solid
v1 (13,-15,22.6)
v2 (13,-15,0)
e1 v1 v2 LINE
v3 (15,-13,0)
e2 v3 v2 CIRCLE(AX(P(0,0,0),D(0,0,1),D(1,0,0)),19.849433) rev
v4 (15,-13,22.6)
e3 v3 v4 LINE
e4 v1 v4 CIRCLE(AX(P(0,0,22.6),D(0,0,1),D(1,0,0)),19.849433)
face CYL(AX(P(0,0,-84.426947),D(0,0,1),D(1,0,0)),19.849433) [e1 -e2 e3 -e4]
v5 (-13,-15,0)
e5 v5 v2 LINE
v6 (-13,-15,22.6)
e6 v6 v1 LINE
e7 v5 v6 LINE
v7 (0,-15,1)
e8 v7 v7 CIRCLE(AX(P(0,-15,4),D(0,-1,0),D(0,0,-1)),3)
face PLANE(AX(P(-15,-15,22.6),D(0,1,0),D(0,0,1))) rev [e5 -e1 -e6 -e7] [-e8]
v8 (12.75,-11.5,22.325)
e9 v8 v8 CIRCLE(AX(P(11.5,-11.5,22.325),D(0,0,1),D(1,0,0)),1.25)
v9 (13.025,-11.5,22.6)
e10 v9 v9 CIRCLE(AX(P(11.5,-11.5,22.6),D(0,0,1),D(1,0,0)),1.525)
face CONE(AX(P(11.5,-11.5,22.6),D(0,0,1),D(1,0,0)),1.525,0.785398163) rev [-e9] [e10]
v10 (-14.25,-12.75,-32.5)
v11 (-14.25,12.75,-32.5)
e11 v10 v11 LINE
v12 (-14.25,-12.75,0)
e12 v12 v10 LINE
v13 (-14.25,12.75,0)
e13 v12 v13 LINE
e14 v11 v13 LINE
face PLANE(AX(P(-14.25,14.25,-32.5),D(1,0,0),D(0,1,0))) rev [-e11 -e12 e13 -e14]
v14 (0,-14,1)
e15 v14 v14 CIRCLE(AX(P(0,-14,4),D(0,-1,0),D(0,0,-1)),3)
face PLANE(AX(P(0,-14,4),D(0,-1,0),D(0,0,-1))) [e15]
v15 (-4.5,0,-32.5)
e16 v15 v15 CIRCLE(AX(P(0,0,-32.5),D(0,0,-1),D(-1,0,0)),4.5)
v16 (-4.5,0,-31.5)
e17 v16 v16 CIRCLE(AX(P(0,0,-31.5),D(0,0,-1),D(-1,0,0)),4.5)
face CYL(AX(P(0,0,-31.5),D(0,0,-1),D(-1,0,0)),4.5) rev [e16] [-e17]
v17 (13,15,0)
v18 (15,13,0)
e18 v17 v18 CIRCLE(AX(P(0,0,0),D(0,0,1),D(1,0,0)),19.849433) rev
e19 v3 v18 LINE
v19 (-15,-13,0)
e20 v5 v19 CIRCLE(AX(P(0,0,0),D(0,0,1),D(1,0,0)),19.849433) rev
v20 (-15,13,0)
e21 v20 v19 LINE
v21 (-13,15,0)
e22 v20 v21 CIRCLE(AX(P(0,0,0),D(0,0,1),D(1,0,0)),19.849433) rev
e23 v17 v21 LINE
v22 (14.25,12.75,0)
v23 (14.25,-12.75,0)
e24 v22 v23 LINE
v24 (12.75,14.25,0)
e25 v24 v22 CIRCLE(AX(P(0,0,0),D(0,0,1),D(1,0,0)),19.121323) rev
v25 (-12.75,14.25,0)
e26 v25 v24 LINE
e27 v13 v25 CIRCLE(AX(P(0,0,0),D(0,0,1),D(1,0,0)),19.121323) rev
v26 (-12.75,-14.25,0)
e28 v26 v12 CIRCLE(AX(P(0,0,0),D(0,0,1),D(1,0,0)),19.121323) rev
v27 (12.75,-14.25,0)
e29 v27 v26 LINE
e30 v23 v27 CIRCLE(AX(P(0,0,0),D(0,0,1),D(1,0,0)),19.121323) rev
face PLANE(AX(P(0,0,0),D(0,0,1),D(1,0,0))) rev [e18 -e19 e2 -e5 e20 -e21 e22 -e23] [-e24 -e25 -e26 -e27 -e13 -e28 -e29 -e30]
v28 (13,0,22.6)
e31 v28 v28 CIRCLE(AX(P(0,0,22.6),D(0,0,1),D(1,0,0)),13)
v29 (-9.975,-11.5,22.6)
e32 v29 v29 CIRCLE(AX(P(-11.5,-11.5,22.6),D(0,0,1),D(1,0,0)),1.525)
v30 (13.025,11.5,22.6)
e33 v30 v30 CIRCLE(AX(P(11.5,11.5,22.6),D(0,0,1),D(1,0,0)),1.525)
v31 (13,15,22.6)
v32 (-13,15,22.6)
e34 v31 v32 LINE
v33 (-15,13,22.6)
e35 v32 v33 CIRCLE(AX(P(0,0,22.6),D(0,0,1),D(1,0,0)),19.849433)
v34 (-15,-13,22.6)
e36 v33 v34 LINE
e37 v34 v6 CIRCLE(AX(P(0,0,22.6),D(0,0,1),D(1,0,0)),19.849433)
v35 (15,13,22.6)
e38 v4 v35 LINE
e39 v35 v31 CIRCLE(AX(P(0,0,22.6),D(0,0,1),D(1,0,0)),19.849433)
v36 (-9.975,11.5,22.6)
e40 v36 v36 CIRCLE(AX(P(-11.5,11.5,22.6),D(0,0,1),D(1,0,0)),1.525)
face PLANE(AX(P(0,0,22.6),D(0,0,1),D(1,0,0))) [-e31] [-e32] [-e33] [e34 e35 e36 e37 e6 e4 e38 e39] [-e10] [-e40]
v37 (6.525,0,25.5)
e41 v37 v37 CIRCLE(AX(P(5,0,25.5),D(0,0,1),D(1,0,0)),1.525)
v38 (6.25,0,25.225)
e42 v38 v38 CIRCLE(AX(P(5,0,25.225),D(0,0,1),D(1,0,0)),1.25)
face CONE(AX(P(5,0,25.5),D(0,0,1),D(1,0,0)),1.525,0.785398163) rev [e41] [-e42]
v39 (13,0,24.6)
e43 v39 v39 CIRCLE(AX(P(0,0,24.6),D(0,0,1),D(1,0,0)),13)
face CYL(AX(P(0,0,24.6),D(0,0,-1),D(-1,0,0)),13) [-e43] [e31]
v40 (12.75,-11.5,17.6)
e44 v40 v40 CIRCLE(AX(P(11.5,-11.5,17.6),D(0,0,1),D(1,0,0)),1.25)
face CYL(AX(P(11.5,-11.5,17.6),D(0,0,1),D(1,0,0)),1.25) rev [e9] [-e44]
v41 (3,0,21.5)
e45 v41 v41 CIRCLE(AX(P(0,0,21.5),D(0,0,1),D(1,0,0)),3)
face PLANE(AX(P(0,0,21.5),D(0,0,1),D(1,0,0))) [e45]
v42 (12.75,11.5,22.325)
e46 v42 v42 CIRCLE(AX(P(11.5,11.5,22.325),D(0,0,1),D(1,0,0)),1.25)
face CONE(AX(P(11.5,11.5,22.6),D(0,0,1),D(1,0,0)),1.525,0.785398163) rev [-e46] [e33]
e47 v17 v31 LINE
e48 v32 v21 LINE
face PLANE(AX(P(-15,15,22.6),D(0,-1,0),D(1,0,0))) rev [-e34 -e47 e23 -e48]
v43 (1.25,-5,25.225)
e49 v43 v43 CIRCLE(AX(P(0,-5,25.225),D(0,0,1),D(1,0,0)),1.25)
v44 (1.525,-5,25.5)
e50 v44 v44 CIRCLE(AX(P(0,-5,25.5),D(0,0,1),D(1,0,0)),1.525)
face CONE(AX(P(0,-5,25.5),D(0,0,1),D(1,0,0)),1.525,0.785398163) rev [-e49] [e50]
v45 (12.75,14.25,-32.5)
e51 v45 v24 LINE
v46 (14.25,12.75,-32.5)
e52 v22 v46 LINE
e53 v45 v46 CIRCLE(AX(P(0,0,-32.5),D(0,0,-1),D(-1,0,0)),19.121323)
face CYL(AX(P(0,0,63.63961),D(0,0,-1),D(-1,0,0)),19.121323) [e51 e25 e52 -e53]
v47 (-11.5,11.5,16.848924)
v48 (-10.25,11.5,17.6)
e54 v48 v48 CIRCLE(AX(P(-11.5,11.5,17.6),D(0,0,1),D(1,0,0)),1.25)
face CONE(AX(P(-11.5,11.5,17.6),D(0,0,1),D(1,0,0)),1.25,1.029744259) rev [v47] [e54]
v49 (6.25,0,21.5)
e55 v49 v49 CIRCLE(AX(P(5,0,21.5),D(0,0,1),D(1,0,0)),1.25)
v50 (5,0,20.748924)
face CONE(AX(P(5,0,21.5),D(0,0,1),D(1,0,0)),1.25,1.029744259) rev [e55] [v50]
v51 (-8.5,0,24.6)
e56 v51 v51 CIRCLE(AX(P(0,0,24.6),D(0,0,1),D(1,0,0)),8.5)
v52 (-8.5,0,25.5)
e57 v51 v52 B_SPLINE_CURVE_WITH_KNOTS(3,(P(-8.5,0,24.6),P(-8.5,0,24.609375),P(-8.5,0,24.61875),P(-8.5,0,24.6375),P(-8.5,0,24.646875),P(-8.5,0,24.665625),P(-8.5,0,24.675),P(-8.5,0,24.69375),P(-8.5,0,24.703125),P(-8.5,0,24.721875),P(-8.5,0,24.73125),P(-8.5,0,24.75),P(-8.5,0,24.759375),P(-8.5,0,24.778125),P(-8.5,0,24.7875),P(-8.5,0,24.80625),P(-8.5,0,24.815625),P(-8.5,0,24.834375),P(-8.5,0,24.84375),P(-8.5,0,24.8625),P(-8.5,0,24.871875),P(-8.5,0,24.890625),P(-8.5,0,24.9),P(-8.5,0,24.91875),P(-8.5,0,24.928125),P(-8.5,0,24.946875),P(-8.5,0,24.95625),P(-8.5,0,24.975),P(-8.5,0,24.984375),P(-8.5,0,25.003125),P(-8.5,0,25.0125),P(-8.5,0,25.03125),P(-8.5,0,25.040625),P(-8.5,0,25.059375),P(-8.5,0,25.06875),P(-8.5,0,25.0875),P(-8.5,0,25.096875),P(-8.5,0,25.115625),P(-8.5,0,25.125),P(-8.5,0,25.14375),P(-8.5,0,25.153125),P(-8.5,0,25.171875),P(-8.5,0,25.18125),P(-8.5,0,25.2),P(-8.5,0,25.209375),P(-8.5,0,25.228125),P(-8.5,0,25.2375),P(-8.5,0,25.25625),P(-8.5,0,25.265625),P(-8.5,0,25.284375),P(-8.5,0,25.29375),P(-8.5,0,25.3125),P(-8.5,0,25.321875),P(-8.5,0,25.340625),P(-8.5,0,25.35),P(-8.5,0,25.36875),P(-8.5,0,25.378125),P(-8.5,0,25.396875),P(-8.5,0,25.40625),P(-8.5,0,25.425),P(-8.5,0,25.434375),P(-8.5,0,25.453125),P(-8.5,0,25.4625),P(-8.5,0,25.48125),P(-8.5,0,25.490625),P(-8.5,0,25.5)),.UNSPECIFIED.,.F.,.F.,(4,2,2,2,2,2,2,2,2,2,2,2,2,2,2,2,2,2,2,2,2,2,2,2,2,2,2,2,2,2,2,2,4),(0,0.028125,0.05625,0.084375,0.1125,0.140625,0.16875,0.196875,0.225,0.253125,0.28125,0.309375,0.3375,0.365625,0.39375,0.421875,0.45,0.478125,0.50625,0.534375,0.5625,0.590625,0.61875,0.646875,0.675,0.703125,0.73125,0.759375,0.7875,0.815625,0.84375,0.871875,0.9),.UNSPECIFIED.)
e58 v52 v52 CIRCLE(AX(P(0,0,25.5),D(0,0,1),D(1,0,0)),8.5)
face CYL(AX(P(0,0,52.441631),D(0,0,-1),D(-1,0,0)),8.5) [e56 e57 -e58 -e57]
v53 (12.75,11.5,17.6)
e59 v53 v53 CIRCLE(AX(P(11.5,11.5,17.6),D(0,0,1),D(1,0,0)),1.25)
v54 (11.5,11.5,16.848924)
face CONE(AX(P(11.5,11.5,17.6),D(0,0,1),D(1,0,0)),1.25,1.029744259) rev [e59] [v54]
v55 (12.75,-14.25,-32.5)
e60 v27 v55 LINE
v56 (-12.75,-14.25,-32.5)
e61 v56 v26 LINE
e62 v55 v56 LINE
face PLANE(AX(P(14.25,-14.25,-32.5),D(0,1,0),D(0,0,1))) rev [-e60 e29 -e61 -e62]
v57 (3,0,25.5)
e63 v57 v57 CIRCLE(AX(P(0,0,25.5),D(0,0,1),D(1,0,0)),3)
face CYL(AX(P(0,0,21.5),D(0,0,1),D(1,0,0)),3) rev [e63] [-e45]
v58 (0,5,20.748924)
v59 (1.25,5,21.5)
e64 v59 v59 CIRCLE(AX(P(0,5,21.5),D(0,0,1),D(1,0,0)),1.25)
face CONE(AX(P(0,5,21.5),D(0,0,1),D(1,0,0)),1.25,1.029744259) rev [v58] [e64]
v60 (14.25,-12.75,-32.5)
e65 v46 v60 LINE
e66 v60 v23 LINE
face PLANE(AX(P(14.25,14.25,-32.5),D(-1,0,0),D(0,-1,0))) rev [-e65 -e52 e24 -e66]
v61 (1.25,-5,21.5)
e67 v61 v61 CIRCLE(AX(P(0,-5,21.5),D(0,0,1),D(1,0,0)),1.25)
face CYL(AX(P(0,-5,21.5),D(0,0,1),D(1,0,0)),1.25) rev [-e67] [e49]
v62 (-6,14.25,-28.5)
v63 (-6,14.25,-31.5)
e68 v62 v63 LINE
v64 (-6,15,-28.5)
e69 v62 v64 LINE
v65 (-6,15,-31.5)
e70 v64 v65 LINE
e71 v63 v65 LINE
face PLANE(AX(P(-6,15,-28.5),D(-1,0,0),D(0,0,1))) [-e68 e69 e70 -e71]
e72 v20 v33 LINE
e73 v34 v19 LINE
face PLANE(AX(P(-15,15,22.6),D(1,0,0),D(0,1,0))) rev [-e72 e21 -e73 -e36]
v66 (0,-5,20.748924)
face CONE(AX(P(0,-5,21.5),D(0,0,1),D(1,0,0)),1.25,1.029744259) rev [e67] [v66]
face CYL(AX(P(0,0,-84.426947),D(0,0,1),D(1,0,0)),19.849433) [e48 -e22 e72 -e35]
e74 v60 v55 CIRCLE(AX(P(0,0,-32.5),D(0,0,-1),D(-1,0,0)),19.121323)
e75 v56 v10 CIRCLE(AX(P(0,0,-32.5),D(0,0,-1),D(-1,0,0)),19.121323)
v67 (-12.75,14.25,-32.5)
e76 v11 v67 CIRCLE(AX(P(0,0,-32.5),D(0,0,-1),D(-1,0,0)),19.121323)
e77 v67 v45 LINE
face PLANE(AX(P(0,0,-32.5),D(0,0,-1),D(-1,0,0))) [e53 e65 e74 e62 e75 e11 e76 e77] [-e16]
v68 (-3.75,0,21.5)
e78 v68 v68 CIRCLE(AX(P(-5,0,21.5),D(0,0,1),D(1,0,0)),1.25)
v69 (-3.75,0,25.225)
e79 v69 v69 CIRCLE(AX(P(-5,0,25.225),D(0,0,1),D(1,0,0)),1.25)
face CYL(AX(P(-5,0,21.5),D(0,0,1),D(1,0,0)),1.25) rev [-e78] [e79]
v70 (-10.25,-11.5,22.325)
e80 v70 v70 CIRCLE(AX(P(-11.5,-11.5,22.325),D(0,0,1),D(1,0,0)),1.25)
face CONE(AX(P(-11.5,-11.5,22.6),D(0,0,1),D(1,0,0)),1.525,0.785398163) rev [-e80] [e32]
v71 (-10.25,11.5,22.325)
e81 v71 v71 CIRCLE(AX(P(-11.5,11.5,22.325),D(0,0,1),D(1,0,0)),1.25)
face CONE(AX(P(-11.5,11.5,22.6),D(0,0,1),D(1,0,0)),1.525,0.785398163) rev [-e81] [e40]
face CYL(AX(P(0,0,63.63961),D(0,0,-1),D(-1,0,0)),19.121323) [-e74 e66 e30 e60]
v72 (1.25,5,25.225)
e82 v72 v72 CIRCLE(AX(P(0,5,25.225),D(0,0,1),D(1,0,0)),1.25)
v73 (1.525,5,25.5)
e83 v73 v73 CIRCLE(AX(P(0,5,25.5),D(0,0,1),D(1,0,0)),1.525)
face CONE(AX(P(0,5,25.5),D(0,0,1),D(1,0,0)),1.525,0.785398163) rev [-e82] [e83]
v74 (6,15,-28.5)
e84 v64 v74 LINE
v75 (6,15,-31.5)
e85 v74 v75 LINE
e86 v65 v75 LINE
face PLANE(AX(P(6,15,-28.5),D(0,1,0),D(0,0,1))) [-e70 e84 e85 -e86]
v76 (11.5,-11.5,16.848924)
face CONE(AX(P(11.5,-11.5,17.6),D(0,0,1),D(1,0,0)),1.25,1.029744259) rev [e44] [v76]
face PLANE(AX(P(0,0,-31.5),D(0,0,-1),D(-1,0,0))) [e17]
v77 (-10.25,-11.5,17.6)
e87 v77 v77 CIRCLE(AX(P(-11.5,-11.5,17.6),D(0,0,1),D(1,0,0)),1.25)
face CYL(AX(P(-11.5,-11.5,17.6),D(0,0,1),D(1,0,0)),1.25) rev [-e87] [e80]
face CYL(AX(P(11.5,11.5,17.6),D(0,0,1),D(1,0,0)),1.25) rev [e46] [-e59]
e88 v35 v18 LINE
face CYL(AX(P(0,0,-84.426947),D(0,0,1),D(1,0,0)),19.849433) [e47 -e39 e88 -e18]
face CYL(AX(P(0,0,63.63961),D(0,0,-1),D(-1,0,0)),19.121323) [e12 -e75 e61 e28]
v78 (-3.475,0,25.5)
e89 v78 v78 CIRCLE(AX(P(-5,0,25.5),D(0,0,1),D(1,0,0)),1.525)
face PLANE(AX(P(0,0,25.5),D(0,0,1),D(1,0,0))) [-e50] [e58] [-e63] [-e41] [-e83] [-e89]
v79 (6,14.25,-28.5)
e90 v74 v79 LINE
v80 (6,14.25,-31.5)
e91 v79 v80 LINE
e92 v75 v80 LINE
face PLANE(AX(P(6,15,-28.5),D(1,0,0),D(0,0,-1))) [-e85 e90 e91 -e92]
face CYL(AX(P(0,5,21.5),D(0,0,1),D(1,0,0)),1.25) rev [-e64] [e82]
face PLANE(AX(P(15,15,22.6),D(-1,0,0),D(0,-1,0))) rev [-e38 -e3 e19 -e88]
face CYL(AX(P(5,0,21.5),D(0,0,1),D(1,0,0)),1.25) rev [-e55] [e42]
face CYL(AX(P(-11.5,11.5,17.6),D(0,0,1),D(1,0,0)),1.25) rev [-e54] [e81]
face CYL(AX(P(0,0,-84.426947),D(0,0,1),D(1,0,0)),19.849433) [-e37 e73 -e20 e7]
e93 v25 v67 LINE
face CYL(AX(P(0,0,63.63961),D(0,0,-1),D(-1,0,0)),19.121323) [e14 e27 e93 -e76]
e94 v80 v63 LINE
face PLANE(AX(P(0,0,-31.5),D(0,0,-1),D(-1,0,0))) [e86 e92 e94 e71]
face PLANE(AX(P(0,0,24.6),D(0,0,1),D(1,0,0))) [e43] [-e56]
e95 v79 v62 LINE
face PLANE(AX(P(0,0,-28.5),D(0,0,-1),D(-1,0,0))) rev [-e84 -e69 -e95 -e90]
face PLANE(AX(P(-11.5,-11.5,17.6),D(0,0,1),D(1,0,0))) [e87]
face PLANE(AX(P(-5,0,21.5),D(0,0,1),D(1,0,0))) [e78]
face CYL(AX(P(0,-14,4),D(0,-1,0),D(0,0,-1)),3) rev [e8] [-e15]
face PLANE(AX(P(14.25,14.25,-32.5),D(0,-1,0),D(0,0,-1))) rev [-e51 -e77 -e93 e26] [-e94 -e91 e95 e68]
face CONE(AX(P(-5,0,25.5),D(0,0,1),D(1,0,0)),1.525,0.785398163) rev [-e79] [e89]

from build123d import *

# Parameters (mm, degrees)
SKETCH1_W           = 30
SKETCH1_H           = 30
BOSS_EXTRUDE1_DEPTH = 22.6
SKETCH3_W           = 28.5
SKETCH3_H           = 28.5
BOSS_EXTRUDE2_DEPTH = 32.5
SKETCH4_R           = 13
BOSS_EXTRUDE3_DEPTH = 2
SKETCH5_R           = 8.5
BOSS_EXTRUDE4_DEPTH = 0.9
SKETCH6_R           = 3
SKETCH6_R_2         = 1.25
CUT_EXTRUDE1_DEPTH  = 4
SKETCH10_R          = 1.25
CUT_EXTRUDE2_DEPTH  = 5
SKETCH12_R          = 3
CUT_EXTRUDE3_DEPTH  = 1
SKETCH13_R          = 29.849433241
SKETCH13_R_2        = 19.849433241
CUT_EXTRUDE4_DEPTH  = 22.6
SKETCH14_R          = 22.5
SKETCH14_R_2        = 19.121323176
CUT_EXTRUDE5_DEPTH  = 32.5
SKETCH15_R          = 4.5
CUT_EXTRUDE6_DEPTH  = 1
BOSS_EXTRUDE5_START = -1
SKETCH16_W          = 12
SKETCH16_H          = 0.75
BOSS_EXTRUDE5_DEPTH = 3


# Read off the part's stored shape, not the designer's step: M3x0.5 Tapped Hole1, M3x0.5 Tapped Hole2
with BuildPart() as part:
    # Sketch1 → Boss-Extrude1 (new body)
    with BuildSketch(Plane.XY):
        Rectangle(SKETCH1_W, SKETCH1_H)
    extrude(amount=BOSS_EXTRUDE1_DEPTH)

    # Sketch3 → Boss-Extrude2 (add)
    with BuildSketch(Plane(origin=(0, 0, 0), x_dir=(-1, 0, 0), z_dir=(0, 0, -1))):
        Rectangle(SKETCH3_W, SKETCH3_H)
    extrude(amount=BOSS_EXTRUDE2_DEPTH)

    # Sketch4 → Boss-Extrude3 (add)
    with BuildSketch(Plane.XY.offset(22.6)):
        Circle(SKETCH4_R)
    extrude(amount=BOSS_EXTRUDE3_DEPTH)

    # Sketch5 → Boss-Extrude4 (add)
    with BuildSketch(Plane.XY.offset(24.6)):
        with Locations(Location((0, 0, 0), (0, 0, 180))):
            Circle(SKETCH5_R)
    extrude(amount=BOSS_EXTRUDE4_DEPTH)

    # Sketch6 → Cut-Extrude1 (cut)
    with BuildSketch(Plane.XY.offset(25.5)):
        Circle(SKETCH6_R)
        with Locations((0, 5)):
            Circle(SKETCH6_R_2)
        with Locations((5, 0)):
            Circle(SKETCH6_R_2)
        with Locations((0, -5)):
            Circle(SKETCH6_R_2)
        with Locations((-5, 0)):
            Circle(SKETCH6_R_2)
    extrude(amount=-CUT_EXTRUDE1_DEPTH, mode=Mode.SUBTRACT)

    # M3x0.5 Tapped Hole1 outline → M3x0.5 Tapped Hole1 (revolve, cut)
    with BuildSketch(Plane(origin=(-5, 0, 0), x_dir=(1, 0, 0), z_dir=(0, -1, 0))):
        Polygon((1.25, 25.5), (1.25, 25.225), (1.525, 25.5), align=None)
    revolve(axis=Axis((-5, 0, 0), (0, 0, 1)), mode=Mode.SUBTRACT)

    # M3x0.5 Tapped Hole1 2 outline → M3x0.5 Tapped Hole1 2 (revolve, cut)
    with BuildSketch(Plane.XZ.offset(5)):
        Polygon((1.25, 25.5), (1.25, 25.225), (1.525, 25.5), align=None)
        Polygon((0, 20.748924226), (1.25, 21.5), (0, 21.5), align=None)
    revolve(axis=Axis((0, -5, 0), (0, 0, 1)), mode=Mode.SUBTRACT)

    # M3x0.5 Tapped Hole1 3 outline → M3x0.5 Tapped Hole1 3 (revolve, cut)
    with BuildSketch(Plane(origin=(5, 0, 0), x_dir=(1, 0, 0), z_dir=(0, -1, 0))):
        Polygon((1.25, 25.5), (1.25, 25.225), (1.525, 25.5), align=None)
        Polygon((0, 20.748924226), (1.25, 21.5), (0, 21.5), align=None)
    revolve(axis=Axis((5, 0, 0), (0, 0, 1)), mode=Mode.SUBTRACT)

    # M3x0.5 Tapped Hole1 4 outline → M3x0.5 Tapped Hole1 4 (revolve, cut)
    with BuildSketch(Plane.XZ.offset(-5)):
        Polygon((1.25, 25.5), (1.25, 25.225), (1.525, 25.5), align=None)
        Polygon((0, 20.748924226), (1.25, 21.5), (0, 21.5), align=None)
    revolve(axis=Axis((0, 5, 0), (0, 0, 1)), mode=Mode.SUBTRACT)

    # Sketch10 → Cut-Extrude2 (cut)
    with BuildSketch(Plane.XY.offset(22.6)):
        with Locations((-11.5, -11.5)):
            Circle(SKETCH10_R)
        with Locations((-11.5, 11.5)):
            Circle(SKETCH10_R)
        with Locations((11.5, 11.5)):
            Circle(SKETCH10_R)
        with Locations((11.5, -11.5)):
            Circle(SKETCH10_R)
    extrude(amount=-CUT_EXTRUDE2_DEPTH, mode=Mode.SUBTRACT)

    # M3x0.5 Tapped Hole2 outline → M3x0.5 Tapped Hole2 (revolve, cut)
    with BuildSketch(Plane(origin=(-11.5, -11.5, 0), x_dir=(1, 0, 0), z_dir=(0, -1, 0))):
        Polygon((1.25, 22.6), (1.25, 22.325), (1.525, 22.6), align=None)
    revolve(axis=Axis((-11.5, -11.5, 0), (0, 0, 1)), mode=Mode.SUBTRACT)

    # M3x0.5 Tapped Hole2 2 outline → M3x0.5 Tapped Hole2 2 (revolve, cut)
    with BuildSketch(Plane(origin=(11.5, -11.5, 0), x_dir=(1, 0, 0), z_dir=(0, -1, 0))):
        Polygon((1.25, 22.6), (1.25, 22.325), (1.525, 22.6), align=None)
        Polygon((0, 16.848924226), (1.25, 17.6), (0, 17.6), align=None)
    revolve(axis=Axis((11.5, -11.5, 0), (0, 0, 1)), mode=Mode.SUBTRACT)

    # M3x0.5 Tapped Hole2 3 outline → M3x0.5 Tapped Hole2 3 (revolve, cut)
    with BuildSketch(Plane(origin=(11.5, 11.5, 0), x_dir=(1, 0, 0), z_dir=(0, -1, 0))):
        Polygon((1.25, 22.6), (1.25, 22.325), (1.525, 22.6), align=None)
        Polygon((0, 16.848924226), (1.25, 17.6), (0, 17.6), align=None)
    revolve(axis=Axis((11.5, 11.5, 0), (0, 0, 1)), mode=Mode.SUBTRACT)

    # M3x0.5 Tapped Hole2 4 outline → M3x0.5 Tapped Hole2 4 (revolve, cut)
    with BuildSketch(Plane(origin=(-11.5, 11.5, 0), x_dir=(1, 0, 0), z_dir=(0, -1, 0))):
        Polygon((1.25, 22.6), (1.25, 22.325), (1.525, 22.6), align=None)
        Polygon((0, 16.848924226), (1.25, 17.6), (0, 17.6), align=None)
    revolve(axis=Axis((-11.5, 11.5, 0), (0, 0, 1)), mode=Mode.SUBTRACT)

    # Sketch12 → Cut-Extrude3 (cut)
    with BuildSketch(Plane.XZ.offset(15)):
        with Locations(Location((0, 4, 0), (0, 0, 270))):
            Circle(SKETCH12_R)
    extrude(amount=-CUT_EXTRUDE3_DEPTH, mode=Mode.SUBTRACT)

    # Sketch13 → Cut-Extrude4 (cut)
    with BuildSketch(Plane.XY.offset(22.6)):
        Circle(SKETCH13_R)
        Circle(SKETCH13_R_2, mode=Mode.SUBTRACT)
    extrude(amount=-CUT_EXTRUDE4_DEPTH, mode=Mode.SUBTRACT)

    # Sketch14 → Cut-Extrude5 (cut)
    with BuildSketch(Plane(origin=(0, 0, -32.5), x_dir=(-1, 0, 0), z_dir=(0, 0, -1))):
        Circle(SKETCH14_R)
        Circle(SKETCH14_R_2, mode=Mode.SUBTRACT)
    extrude(amount=-CUT_EXTRUDE5_DEPTH, mode=Mode.SUBTRACT)

    # Sketch15 → Cut-Extrude6 (cut)
    with BuildSketch(Plane(origin=(0, 0, -32.5), x_dir=(-1, 0, 0), z_dir=(0, 0, -1))):
        Circle(SKETCH15_R)
    extrude(amount=-CUT_EXTRUDE6_DEPTH, mode=Mode.SUBTRACT)

    # Sketch16 → Boss-Extrude5 (add)
    with BuildSketch(Plane(origin=(0, 0, -32.5), x_dir=(-1, 0, 0), z_dir=(0, 0, -1)).offset(BOSS_EXTRUDE5_START)):
        with Locations((0, 14.625)):
            Rectangle(SKETCH16_W, SKETCH16_H)
    extrude(amount=-BOSS_EXTRUDE5_DEPTH)


solid = part.part
